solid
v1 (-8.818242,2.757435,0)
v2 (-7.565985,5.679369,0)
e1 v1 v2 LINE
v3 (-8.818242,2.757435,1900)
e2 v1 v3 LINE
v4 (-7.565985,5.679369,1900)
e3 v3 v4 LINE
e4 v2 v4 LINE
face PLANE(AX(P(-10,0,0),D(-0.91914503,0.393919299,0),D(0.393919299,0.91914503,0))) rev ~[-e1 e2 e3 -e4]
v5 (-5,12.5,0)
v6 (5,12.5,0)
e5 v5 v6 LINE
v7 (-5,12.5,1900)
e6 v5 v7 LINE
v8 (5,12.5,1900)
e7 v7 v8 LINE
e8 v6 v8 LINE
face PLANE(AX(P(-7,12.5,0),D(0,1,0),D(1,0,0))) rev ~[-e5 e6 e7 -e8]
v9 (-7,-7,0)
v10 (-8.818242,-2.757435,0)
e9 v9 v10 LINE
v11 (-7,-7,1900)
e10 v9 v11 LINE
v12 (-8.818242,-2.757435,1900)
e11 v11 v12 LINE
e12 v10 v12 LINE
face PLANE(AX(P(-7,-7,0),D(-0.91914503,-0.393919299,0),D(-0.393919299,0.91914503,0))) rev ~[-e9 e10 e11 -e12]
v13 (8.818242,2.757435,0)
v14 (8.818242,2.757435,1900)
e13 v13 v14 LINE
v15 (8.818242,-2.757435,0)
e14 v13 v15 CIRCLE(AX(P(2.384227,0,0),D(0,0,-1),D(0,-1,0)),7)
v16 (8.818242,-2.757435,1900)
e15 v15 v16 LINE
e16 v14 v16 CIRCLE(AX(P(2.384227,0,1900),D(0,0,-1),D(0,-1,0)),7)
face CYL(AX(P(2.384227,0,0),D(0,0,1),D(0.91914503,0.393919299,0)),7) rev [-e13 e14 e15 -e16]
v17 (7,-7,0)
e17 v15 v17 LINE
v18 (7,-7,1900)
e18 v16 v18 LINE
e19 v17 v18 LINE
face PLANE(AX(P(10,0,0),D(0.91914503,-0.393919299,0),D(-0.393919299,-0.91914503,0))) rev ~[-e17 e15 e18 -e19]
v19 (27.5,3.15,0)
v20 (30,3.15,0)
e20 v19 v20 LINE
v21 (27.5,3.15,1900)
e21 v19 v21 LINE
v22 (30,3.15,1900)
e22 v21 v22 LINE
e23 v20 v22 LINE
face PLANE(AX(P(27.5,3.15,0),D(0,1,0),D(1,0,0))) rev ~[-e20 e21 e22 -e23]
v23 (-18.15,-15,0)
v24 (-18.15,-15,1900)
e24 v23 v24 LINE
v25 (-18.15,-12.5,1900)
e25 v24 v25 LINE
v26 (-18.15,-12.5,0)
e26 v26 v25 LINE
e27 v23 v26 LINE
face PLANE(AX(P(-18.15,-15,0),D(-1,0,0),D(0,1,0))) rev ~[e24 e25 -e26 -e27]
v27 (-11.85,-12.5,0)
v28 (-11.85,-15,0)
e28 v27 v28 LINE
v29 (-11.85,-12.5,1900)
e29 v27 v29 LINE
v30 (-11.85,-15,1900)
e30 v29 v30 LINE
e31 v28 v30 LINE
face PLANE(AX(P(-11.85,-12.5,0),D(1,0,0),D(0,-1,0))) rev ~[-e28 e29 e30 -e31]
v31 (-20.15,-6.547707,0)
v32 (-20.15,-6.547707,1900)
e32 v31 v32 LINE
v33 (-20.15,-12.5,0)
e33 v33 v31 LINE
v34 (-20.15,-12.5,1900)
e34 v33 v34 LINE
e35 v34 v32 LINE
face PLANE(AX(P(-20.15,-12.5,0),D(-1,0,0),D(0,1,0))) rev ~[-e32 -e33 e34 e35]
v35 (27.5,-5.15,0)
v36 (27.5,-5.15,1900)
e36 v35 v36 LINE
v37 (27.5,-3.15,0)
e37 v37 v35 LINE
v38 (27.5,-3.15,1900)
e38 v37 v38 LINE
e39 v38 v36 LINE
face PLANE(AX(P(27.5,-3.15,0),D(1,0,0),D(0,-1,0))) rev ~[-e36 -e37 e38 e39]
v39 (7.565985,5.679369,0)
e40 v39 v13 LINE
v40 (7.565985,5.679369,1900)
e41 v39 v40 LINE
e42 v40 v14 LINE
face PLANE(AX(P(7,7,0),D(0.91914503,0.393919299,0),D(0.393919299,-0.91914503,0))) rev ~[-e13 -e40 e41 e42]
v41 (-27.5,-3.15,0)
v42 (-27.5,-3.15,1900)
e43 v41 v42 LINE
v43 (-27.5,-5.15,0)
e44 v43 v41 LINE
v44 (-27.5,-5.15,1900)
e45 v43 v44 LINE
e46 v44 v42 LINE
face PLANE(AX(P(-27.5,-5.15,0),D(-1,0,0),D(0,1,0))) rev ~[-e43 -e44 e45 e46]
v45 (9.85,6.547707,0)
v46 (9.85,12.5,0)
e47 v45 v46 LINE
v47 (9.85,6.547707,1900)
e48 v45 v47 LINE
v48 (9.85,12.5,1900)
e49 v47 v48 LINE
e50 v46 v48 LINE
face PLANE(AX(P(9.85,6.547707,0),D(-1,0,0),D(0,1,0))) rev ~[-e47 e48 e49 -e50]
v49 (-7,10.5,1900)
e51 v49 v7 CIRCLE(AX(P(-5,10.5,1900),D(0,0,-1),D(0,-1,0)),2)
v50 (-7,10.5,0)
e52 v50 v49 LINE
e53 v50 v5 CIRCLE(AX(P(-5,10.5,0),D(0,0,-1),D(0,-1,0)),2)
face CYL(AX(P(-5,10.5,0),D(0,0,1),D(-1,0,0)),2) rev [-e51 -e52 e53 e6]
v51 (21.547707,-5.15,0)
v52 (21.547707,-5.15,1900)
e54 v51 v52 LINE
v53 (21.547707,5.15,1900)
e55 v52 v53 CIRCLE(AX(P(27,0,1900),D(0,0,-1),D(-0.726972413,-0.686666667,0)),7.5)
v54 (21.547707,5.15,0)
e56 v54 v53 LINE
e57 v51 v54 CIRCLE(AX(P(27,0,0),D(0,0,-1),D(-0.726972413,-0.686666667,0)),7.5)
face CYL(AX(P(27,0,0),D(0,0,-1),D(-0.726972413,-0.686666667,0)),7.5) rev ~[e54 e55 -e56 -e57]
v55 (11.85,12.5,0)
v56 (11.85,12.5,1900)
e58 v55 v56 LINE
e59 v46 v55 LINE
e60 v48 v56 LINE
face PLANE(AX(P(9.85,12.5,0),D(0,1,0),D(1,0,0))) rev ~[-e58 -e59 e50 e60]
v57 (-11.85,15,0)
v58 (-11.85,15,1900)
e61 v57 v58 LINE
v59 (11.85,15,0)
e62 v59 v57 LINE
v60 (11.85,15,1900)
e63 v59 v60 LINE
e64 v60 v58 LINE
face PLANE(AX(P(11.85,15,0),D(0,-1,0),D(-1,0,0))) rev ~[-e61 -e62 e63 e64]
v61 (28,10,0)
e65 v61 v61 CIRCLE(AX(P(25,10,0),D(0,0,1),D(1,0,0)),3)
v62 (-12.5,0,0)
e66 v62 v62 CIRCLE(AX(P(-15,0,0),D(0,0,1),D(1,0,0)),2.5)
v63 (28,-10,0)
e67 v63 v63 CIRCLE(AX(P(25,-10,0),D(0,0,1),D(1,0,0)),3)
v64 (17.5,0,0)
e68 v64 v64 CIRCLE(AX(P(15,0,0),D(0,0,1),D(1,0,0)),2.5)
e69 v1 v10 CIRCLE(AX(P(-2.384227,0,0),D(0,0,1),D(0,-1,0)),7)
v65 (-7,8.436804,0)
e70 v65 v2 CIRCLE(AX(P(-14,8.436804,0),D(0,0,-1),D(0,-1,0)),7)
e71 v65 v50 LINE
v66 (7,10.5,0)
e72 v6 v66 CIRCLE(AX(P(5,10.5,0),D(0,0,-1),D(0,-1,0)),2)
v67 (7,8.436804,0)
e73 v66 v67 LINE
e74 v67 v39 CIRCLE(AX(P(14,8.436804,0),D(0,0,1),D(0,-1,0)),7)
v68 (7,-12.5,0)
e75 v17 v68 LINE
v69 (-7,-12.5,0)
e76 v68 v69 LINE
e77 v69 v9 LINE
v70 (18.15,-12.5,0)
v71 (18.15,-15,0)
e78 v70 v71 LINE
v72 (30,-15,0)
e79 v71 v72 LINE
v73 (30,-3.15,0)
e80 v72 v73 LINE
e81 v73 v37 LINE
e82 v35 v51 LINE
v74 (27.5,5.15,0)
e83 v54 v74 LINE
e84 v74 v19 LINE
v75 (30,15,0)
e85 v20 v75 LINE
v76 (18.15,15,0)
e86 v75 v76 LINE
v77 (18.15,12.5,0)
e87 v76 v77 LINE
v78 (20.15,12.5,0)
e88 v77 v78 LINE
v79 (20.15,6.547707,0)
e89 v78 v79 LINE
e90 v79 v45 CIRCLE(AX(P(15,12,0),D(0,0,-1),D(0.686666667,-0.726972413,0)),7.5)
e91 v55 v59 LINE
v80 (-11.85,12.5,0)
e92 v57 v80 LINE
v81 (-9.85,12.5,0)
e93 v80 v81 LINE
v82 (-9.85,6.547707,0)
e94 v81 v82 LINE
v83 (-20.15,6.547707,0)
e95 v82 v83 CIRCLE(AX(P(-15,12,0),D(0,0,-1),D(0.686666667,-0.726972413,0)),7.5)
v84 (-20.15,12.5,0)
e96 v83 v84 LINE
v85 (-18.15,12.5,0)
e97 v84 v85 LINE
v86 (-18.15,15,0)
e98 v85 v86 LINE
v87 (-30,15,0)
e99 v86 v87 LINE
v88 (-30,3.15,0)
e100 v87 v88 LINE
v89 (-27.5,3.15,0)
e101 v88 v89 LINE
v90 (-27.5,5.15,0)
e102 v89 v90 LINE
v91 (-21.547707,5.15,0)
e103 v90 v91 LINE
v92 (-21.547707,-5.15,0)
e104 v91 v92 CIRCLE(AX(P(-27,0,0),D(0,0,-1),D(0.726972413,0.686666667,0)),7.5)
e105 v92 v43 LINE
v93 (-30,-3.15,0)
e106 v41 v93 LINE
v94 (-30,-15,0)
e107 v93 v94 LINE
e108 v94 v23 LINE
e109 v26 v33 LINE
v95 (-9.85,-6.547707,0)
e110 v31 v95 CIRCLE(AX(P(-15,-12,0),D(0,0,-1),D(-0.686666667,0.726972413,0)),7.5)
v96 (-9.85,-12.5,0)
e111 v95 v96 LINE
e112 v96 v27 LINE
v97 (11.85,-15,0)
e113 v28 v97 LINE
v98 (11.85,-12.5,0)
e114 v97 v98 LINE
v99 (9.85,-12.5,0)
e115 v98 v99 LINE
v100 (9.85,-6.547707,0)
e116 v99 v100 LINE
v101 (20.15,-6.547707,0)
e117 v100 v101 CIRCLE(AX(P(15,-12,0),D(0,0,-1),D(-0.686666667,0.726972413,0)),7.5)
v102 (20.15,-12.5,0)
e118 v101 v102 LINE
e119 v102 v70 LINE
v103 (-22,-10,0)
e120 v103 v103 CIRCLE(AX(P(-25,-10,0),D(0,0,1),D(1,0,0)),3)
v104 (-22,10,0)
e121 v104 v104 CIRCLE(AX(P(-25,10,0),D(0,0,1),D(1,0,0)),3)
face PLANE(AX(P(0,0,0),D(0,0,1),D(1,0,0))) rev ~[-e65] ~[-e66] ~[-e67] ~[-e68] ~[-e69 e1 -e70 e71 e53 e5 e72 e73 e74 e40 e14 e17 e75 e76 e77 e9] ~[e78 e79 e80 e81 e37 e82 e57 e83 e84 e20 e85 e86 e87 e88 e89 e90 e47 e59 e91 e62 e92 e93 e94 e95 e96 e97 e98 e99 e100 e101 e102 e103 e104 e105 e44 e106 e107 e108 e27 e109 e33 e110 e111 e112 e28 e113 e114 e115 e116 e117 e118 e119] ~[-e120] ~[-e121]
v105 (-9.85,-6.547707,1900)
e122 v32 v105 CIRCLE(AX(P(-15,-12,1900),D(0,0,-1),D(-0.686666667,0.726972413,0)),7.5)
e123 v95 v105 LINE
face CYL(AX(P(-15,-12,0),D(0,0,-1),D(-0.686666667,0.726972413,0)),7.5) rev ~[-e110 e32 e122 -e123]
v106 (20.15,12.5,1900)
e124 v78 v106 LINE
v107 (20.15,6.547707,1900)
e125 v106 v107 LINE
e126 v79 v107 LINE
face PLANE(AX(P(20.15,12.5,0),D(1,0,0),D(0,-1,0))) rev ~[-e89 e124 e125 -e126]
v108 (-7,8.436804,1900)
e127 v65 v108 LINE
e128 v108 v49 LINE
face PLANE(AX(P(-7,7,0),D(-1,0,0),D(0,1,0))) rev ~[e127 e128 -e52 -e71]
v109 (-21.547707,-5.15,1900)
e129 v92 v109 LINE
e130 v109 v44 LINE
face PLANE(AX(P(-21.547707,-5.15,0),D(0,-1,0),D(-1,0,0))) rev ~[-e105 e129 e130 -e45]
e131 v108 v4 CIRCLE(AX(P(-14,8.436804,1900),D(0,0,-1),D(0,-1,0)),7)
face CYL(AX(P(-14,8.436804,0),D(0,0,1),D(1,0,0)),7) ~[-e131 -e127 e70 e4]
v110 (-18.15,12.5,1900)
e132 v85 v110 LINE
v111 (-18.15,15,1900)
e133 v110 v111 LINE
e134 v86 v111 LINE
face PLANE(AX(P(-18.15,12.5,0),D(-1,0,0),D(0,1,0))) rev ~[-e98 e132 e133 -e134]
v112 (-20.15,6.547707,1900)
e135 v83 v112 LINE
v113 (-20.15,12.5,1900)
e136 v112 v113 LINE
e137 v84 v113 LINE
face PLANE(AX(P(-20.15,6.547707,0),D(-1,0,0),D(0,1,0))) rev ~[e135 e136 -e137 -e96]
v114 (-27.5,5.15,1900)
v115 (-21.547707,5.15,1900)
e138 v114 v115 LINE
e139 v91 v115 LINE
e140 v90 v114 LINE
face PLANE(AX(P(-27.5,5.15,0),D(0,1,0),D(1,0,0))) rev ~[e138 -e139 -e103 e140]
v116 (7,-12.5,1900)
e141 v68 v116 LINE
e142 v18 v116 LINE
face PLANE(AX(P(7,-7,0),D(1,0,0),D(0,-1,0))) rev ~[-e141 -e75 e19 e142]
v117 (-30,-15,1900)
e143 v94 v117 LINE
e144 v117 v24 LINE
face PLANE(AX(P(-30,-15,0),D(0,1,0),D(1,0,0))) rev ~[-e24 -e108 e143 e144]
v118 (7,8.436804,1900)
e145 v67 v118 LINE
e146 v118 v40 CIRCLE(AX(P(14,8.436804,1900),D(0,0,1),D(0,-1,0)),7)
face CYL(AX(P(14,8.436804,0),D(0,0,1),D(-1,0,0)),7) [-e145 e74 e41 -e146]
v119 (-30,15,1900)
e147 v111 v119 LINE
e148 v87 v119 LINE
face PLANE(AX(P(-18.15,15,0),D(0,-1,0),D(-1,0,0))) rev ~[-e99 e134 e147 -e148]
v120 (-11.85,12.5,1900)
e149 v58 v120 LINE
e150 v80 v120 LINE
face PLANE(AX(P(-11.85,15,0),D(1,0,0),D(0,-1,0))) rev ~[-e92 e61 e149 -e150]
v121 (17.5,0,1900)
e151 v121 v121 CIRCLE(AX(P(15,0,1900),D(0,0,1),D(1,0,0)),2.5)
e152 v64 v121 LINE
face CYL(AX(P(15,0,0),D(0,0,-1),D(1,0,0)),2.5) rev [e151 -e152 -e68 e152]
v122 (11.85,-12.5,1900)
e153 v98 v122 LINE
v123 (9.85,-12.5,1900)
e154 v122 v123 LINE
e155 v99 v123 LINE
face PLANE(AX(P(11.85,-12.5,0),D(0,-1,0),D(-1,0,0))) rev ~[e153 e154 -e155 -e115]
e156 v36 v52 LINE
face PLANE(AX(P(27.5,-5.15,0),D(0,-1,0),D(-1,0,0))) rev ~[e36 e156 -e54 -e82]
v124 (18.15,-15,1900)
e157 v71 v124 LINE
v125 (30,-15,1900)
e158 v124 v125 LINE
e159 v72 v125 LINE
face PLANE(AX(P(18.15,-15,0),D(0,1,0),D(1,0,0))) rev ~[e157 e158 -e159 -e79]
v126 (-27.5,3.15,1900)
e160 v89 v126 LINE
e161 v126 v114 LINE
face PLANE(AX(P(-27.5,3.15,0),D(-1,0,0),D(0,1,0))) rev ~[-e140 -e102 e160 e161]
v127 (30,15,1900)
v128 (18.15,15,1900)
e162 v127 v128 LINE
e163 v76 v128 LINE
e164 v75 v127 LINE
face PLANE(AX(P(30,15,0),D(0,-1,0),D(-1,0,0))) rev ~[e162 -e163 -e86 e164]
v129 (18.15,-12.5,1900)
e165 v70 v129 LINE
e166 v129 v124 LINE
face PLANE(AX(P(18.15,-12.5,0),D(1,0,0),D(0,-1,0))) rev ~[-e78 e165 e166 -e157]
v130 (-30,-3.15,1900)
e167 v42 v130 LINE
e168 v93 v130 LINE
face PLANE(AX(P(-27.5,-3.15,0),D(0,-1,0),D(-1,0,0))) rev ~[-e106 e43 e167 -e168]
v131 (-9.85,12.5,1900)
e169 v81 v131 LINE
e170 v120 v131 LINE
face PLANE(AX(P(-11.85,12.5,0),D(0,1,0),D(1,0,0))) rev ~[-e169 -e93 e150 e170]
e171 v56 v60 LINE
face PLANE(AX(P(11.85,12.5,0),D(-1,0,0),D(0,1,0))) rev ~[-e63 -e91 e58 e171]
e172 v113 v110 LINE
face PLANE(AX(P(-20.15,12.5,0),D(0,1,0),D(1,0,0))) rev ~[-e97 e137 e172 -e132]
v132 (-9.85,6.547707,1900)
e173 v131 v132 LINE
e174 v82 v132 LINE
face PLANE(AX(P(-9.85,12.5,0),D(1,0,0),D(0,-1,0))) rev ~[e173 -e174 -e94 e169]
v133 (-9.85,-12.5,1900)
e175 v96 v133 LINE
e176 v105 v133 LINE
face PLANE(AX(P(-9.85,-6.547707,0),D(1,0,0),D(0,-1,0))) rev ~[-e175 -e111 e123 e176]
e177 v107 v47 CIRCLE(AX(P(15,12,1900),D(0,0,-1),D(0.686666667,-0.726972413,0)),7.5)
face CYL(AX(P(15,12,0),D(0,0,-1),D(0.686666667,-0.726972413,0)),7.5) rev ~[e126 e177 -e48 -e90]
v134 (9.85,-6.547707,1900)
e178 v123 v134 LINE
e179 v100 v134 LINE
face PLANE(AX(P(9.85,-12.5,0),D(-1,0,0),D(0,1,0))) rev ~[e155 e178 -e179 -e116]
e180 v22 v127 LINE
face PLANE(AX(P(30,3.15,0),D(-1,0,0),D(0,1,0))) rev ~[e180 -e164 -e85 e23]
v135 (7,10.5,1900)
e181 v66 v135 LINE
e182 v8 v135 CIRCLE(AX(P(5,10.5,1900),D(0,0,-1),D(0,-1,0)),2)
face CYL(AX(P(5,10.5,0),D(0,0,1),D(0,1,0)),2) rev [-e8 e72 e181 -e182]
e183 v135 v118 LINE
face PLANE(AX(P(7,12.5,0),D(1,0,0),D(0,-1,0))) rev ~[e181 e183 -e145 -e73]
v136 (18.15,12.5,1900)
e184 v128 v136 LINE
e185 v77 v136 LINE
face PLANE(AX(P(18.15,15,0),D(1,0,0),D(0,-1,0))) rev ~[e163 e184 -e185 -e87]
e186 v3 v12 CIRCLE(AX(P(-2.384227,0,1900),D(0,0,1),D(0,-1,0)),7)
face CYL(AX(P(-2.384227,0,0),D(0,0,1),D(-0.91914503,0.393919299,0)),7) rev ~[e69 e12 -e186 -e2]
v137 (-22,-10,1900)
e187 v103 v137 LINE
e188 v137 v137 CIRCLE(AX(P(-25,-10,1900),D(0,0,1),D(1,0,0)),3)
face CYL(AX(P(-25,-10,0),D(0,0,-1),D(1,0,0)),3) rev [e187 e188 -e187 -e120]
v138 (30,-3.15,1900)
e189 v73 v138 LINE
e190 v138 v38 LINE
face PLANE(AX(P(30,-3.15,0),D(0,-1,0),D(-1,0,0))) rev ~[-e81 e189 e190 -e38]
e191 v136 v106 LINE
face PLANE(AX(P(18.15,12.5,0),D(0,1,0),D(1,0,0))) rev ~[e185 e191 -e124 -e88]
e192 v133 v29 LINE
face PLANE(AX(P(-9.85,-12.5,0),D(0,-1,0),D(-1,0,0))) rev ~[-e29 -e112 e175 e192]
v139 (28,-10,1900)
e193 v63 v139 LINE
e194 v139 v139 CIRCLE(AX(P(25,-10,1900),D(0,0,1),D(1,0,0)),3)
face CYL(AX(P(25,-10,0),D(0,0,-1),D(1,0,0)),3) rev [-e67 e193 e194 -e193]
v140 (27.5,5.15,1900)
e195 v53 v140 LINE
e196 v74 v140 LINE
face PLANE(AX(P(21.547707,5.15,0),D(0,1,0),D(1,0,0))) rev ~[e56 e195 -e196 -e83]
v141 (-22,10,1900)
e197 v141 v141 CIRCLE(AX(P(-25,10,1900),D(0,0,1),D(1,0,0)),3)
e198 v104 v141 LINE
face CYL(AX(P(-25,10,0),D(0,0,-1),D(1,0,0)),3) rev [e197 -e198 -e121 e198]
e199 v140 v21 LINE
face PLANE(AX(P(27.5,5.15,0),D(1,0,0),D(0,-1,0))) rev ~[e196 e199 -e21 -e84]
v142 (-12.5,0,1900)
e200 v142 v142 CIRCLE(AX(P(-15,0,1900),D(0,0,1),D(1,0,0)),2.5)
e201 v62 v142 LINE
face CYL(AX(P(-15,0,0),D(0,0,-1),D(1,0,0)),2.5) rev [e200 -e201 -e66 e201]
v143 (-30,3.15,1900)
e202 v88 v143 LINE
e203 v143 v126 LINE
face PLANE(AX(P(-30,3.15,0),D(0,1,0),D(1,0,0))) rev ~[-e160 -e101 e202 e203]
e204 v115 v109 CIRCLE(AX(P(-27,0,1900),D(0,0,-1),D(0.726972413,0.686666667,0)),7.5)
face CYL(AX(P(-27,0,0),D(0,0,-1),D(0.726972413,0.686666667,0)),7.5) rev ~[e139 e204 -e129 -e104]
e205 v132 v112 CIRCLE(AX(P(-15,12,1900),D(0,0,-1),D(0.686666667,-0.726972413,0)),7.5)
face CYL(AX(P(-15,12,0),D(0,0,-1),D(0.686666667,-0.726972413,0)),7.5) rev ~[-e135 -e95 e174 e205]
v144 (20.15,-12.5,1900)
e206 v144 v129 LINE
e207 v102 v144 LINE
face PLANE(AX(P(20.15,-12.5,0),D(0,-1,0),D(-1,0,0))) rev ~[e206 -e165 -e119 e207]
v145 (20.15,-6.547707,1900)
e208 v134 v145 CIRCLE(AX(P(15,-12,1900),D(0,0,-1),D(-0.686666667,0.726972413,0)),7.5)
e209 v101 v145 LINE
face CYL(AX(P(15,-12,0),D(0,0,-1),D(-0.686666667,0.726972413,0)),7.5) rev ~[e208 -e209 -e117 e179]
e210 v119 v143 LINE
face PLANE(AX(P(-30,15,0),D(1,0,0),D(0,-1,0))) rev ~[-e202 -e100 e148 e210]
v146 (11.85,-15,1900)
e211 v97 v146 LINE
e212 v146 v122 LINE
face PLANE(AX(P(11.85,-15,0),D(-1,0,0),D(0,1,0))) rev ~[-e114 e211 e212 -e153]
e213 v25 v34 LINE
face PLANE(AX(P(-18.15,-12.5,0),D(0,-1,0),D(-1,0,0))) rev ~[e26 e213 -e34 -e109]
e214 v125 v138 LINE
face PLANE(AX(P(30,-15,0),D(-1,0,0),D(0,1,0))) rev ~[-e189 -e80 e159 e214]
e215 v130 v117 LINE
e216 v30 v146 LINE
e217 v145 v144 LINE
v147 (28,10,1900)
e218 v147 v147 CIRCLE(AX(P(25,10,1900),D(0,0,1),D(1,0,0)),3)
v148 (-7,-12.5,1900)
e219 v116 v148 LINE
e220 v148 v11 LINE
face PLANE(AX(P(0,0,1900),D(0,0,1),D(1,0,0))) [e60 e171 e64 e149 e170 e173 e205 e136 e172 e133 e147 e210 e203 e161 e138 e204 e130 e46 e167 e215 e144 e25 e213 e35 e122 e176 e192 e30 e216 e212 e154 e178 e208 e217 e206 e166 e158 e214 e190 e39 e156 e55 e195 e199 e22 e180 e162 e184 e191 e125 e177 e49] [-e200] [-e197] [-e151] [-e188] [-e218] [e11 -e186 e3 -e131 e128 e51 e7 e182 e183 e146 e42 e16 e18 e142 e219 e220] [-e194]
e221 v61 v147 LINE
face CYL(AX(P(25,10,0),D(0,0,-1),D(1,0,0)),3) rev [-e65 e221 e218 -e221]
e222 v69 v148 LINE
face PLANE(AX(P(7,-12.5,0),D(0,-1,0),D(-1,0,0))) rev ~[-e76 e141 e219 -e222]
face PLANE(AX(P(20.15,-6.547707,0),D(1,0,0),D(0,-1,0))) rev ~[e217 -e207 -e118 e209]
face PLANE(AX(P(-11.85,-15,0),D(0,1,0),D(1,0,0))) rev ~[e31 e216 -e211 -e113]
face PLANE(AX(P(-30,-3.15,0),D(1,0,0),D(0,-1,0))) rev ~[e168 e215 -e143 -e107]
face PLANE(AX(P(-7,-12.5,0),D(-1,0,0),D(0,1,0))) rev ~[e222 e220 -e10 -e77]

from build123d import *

# Parameters (mm, degrees)
F0_R     = 3
F0_R_2   = 2.5
F1_DEPTH = 1900
F2_R     = 2
F3_R     = 7


# Not quite as in the source:
# - a feature names something its author has since deleted; it is built from what else it names


with BuildPart() as f1:
    # F0 (on Top) → F1 (new body)
    with BuildSketch(Plane.XY):
        with BuildLine():
            Line((18.15, -15), (30, -15))
            Line((30, -15), (30, -3.15))
            Line((30, -3.15), (27.5, -3.15))
            Line((27.5, -3.15), (27.5, -5.15))
            Line((27.5, -5.15), (21.5477069044, -5.15))
            ThreePointArc((21.5477069044, -5.15), (19.5, 0), (21.5477069044, 5.15))
            Line((21.5477069044, 5.15), (27.5, 5.15))
            Line((27.5, 5.15), (27.5, 3.15))
            Line((27.5, 3.15), (30, 3.15))
            Line((30, 3.15), (30, 15))
            Line((30, 15), (18.15, 15))
            Line((18.15, 15), (18.15, 12.5))
            Line((18.15, 12.5), (20.15, 12.5))
            Line((20.15, 12.5), (20.15, 6.5477069044))
            ThreePointArc((20.15, 6.5477069044), (15, 4.5), (9.85, 6.5477069044))
            Line((9.85, 6.5477069044), (9.85, 12.5))
            Line((9.85, 12.5), (11.85, 12.5))
            Line((11.85, 12.5), (11.85, 15))
            Line((11.85, 15), (-11.85, 15))
            Line((-11.85, 15), (-11.85, 12.5))
            Line((-11.85, 12.5), (-9.85, 12.5))
            Line((-9.85, 12.5), (-9.85, 6.5477069044))
            ThreePointArc((-9.85, 6.5477069044), (-15, 4.5), (-20.15, 6.5477069044))
            Line((-20.15, 6.5477069044), (-20.15, 12.5))
            Line((-20.15, 12.5), (-18.15, 12.5))
            Line((-18.15, 12.5), (-18.15, 15))
            Line((-18.15, 15), (-30, 15))
            Line((-30, 15), (-30, 3.15))
            Line((-30, 3.15), (-27.5, 3.15))
            Line((-27.5, 3.15), (-27.5, 5.15))
            Line((-27.5, 5.15), (-21.5477069044, 5.15))
            ThreePointArc((-21.5477069044, 5.15), (-19.5, 0), (-21.5477069044, -5.15))
            Line((-21.5477069044, -5.15), (-27.5, -5.15))
            Line((-27.5, -5.15), (-27.5, -3.15))
            Line((-27.5, -3.15), (-30, -3.15))
            Line((-30, -3.15), (-30, -15))
            Line((-30, -15), (-18.15, -15))
            Line((-18.15, -15), (-18.15, -12.5))
            Line((-18.15, -12.5), (-20.15, -12.5))
            Line((-20.15, -12.5), (-20.15, -6.5477069044))
            ThreePointArc((-20.15, -6.5477069044), (-15, -4.5), (-9.85, -6.5477069044))
            Line((-9.85, -6.5477069044), (-9.85, -12.5))
            Line((-9.85, -12.5), (-11.85, -12.5))
            Line((-11.85, -12.5), (-11.85, -15))
            Line((-11.85, -15), (11.85, -15))
            Line((11.85, -15), (11.85, -12.5))
            Line((11.85, -12.5), (9.85, -12.5))
            Line((9.85, -12.5), (9.85, -6.5477069044))
            ThreePointArc((9.85, -6.5477069044), (15, -4.5), (20.15, -6.5477069044))
            Line((20.15, -6.5477069044), (20.15, -12.5))
            Line((20.15, -12.5), (18.15, -12.5))
            Line((18.15, -12.5), (18.15, -15))
        make_face()
        with Locations((-25, -10)):
            Circle(F0_R, mode=Mode.SUBTRACT)
        with Locations((25, -10)):
            Circle(F0_R, mode=Mode.SUBTRACT)
        with Locations((-15, 0)):
            Circle(F0_R_2, mode=Mode.SUBTRACT)
        with Locations((-25, 10)):
            Circle(F0_R, mode=Mode.SUBTRACT)
        Polygon((-7, 7), (-7, 12.5), (0, 12.5), (7, 12.5), (7, 7), (10, 0), (7, -7), (7, -12.5), (0, -12.5), (-7, -12.5), (-7, -7), (-10, 0), align=None, mode=Mode.SUBTRACT)
        with Locations((15, 0)):
            Circle(F0_R_2, mode=Mode.SUBTRACT)
        with Locations((25, 10)):
            Circle(F0_R, mode=Mode.SUBTRACT)
    extrude(amount=F1_DEPTH)

    # F2
    f2_edges = [f1.edges().sort_by_distance(p)[0] for p in [
        (-7, 12.5, 950),
        (7, 12.5, 950),
    ]]
    fillet(f2_edges, radius=F2_R)

    # F3
    f3_edges = [f1.edges().sort_by_distance(p)[0] for p in [
        (-7, 7, 950),
        (-10, 0, 950),
        (7, 7, 950),
        (10, 0, 950),
    ]]
    fillet(f3_edges, radius=F3_R)


solid = f1.part
